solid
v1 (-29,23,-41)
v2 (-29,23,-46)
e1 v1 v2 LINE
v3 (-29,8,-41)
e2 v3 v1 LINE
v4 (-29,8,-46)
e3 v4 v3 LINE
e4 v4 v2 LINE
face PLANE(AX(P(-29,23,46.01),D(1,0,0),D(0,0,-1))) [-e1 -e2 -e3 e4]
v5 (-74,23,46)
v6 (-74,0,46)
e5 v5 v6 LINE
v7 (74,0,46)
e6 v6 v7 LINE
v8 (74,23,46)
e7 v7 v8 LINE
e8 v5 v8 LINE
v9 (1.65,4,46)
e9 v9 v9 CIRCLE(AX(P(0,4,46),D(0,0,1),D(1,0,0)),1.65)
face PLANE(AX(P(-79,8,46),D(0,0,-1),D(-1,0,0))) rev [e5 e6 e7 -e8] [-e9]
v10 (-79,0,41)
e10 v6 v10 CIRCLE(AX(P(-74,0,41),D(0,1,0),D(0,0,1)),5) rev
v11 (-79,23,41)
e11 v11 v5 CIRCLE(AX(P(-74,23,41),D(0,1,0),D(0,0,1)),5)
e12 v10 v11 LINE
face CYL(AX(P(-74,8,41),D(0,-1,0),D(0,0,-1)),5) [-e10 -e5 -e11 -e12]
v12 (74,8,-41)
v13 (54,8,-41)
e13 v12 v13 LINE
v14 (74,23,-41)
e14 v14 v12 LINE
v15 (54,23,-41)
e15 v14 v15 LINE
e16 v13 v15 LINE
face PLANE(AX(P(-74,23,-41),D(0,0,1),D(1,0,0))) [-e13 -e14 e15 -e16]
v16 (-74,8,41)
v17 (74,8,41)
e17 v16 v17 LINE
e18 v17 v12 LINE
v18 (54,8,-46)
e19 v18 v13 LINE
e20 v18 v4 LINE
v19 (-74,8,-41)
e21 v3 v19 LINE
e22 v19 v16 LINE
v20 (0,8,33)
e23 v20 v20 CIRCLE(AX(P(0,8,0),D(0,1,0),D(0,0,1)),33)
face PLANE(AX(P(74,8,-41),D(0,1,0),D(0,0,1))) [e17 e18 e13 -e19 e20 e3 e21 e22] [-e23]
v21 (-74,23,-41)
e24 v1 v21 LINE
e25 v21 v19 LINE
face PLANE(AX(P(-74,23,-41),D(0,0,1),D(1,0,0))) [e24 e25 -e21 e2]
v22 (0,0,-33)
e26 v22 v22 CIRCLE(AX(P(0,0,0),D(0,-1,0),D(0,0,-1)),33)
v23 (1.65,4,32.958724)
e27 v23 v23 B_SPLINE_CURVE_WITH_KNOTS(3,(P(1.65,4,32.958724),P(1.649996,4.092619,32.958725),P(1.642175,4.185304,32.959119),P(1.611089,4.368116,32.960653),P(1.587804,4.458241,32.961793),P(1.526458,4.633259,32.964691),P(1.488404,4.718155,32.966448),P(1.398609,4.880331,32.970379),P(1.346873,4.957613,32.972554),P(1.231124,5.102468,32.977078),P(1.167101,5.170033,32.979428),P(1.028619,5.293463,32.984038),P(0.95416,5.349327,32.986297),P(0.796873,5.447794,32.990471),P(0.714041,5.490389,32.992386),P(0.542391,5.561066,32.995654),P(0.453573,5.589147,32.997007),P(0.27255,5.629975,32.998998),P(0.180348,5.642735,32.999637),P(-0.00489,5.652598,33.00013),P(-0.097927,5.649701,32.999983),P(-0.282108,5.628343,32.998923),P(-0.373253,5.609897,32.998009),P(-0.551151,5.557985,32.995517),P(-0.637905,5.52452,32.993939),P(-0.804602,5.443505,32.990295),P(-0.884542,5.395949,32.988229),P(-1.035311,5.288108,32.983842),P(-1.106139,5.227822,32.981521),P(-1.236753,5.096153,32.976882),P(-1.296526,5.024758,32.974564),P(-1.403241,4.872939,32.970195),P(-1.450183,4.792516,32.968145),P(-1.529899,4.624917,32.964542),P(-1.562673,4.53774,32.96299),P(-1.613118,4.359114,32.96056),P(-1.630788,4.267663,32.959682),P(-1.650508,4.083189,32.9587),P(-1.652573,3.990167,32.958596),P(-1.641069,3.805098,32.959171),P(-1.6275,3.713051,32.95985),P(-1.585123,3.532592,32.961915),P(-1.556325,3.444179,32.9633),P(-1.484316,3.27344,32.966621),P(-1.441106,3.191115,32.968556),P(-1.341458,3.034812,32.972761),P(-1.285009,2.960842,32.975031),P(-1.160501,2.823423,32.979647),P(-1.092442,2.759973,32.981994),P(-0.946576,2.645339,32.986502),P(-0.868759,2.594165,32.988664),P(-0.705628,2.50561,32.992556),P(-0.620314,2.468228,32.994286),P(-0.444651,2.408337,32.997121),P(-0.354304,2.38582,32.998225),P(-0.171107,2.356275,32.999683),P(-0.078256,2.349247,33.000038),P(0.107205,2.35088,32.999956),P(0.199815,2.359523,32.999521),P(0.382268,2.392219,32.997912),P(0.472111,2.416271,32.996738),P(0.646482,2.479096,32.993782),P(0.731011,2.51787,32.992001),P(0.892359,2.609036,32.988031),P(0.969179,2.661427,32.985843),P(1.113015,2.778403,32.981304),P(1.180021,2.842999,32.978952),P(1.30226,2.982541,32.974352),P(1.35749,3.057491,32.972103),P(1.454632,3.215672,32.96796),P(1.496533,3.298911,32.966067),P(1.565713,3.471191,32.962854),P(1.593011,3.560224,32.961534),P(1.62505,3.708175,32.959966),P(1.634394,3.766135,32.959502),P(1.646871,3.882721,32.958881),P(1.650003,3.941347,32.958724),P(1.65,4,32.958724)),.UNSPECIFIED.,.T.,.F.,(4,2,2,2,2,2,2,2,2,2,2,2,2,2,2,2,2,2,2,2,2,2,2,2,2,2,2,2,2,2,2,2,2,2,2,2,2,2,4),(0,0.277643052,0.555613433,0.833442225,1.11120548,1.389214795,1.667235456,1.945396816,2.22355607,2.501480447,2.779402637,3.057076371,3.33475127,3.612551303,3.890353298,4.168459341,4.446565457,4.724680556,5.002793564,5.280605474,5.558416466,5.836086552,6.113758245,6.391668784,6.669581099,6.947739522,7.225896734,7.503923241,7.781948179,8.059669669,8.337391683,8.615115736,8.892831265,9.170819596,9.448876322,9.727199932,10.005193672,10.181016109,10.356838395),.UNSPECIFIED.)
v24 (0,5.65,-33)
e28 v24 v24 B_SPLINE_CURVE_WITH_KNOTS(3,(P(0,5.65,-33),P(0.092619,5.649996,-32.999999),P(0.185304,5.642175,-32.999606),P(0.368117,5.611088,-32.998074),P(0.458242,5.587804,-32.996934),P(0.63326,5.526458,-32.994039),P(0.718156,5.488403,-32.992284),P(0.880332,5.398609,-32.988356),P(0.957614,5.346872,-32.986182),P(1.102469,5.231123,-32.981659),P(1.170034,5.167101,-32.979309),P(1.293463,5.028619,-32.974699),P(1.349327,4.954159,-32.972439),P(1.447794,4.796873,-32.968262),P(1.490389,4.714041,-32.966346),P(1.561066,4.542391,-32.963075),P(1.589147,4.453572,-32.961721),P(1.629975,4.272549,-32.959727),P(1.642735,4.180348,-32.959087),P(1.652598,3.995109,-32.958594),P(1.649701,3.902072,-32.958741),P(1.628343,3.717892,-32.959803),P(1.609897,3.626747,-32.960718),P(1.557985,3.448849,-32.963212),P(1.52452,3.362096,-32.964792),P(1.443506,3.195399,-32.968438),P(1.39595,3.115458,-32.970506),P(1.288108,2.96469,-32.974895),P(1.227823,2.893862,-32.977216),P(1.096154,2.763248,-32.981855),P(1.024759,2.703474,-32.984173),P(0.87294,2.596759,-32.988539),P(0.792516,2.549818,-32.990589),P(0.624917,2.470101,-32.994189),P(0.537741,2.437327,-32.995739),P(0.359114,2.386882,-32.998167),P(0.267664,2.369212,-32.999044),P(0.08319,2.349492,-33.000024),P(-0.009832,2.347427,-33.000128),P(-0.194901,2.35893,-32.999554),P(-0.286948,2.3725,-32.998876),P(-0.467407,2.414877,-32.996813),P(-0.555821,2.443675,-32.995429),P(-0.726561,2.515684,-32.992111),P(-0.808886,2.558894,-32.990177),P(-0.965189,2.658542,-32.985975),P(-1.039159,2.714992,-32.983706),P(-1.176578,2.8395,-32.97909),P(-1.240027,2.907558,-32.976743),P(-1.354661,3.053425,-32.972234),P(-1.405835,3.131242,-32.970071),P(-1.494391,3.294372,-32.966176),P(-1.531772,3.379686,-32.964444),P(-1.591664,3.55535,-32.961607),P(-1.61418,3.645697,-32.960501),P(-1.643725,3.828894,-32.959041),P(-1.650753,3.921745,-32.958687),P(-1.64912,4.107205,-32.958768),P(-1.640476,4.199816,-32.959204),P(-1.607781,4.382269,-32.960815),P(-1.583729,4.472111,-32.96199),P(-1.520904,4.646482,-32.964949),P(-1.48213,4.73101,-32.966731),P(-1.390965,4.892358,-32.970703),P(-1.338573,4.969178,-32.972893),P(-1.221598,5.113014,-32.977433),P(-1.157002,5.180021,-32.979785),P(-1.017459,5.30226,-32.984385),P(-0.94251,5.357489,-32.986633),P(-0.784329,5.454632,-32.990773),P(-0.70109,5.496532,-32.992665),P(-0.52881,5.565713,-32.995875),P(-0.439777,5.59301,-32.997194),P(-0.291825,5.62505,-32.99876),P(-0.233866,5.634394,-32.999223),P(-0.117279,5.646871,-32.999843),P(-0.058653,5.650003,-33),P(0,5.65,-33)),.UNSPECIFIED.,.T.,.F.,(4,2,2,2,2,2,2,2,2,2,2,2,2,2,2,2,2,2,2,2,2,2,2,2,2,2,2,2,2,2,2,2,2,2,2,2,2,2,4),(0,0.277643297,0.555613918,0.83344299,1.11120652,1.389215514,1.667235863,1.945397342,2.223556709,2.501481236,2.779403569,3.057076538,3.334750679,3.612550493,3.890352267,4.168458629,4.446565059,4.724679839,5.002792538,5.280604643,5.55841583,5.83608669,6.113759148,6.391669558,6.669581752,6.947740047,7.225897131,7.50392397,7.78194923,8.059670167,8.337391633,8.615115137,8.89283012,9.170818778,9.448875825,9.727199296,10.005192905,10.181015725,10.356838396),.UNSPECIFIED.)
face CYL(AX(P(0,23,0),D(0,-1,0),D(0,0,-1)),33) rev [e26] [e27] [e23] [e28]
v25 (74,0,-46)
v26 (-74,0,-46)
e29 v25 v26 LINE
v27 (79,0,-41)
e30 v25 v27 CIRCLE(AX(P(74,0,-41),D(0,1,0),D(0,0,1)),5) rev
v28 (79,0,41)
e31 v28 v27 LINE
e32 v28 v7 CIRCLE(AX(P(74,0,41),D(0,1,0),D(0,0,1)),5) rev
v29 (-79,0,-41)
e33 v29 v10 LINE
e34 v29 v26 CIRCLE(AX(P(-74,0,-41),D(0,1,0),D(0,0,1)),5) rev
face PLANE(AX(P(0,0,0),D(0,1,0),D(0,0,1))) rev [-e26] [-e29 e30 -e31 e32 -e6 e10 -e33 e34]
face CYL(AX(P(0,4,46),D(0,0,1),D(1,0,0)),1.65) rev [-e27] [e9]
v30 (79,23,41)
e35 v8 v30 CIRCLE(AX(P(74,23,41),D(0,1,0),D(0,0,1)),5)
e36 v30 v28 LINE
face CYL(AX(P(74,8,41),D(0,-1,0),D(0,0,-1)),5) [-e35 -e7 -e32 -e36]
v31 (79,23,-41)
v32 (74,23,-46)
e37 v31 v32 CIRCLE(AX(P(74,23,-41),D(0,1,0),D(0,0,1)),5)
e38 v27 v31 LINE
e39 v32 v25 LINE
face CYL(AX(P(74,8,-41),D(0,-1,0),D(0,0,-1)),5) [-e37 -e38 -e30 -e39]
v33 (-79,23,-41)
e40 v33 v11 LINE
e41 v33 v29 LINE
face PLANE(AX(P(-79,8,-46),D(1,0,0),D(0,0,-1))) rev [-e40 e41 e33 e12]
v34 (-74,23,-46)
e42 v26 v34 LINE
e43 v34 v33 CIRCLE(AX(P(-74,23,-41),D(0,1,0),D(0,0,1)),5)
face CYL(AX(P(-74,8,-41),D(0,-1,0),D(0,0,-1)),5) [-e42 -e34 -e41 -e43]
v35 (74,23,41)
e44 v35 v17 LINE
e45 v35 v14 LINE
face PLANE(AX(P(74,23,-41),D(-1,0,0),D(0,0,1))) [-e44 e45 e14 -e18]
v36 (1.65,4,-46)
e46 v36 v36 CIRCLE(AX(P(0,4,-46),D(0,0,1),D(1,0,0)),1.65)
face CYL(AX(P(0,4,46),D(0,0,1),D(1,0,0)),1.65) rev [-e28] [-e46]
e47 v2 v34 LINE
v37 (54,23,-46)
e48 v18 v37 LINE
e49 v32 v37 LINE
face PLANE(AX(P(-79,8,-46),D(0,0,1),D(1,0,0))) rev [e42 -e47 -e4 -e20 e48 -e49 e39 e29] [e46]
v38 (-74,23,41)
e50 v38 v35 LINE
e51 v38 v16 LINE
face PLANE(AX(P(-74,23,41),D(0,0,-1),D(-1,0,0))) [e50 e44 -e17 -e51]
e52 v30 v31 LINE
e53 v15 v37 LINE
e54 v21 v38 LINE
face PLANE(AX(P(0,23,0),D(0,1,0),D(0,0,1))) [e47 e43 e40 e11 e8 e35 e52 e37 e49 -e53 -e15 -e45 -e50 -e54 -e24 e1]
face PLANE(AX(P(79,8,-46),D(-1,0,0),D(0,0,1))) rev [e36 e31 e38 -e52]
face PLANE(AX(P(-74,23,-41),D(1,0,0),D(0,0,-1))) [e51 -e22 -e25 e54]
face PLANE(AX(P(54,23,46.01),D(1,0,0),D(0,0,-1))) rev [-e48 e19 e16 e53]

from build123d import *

# Parameters (mm, degrees)
SKETCH1_W             = 158
SKETCH1_H             = 92
BOSS_EXTRUDE1_DEPTH   = 8
SKETCH2_W             = 158
SKETCH2_H             = 92
SKETCH2_W_2           = 148
SKETCH2_H_2           = 82
BOSS_EXTRUDE2_DEPTH   = 15
SKETCH3_R             = 33
CUT_EXTRUDE1_DEPTH    = 95.265582266
FILLET1_R             = 5
FILLET2_R             = 5
SPLIT1_START          = -29
SPLIT1_OUTLINE_W      = 15
SPLIT1_OUTLINE_H      = 5
SPLIT1_DEPTH          = 83
M4X0_7_TAPPED_HOLE1_D = 3.3


# Read off the part's stored shape, not the designer's step: Split1
with BuildPart() as part:
    # Sketch1 → Boss-Extrude1 (new body)
    with BuildSketch(Plane(origin=(0, 0, 0), x_dir=(1, 0, 0), z_dir=(0, 1, 0))):
        Rectangle(SKETCH1_W, SKETCH1_H)
    extrude(amount=BOSS_EXTRUDE1_DEPTH)

    # Sketch2 → Boss-Extrude2 (add)
    with BuildSketch(Plane(origin=(0, 8, 0), x_dir=(1, 0, 0), z_dir=(0, 1, 0))):
        Rectangle(SKETCH2_W, SKETCH2_H)
        Rectangle(SKETCH2_W_2, SKETCH2_H_2, mode=Mode.SUBTRACT)
    extrude(amount=BOSS_EXTRUDE2_DEPTH)

    # Sketch3 → Cut-Extrude1 (cut, through all)
    with BuildSketch(Plane.XZ):
        with Locations(Location((0, 0, 0), (0, 0, 270))):
            Circle(SKETCH3_R)
    extrude(amount=-CUT_EXTRUDE1_DEPTH, mode=Mode.SUBTRACT)

    # Fillet1
    fillet1_edges = [part.edges().sort_by_distance(p)[0] for p in [
        (-79, 11.5, 46),
    ]]
    fillet(fillet1_edges, radius=FILLET1_R)

    # Fillet2
    fillet2_edges = [part.edges().sort_by_distance(p)[0] for p in [
        (79, 11.5, 46),
        (-79, 11.5, -46),
        (79, 11.5, -46),
    ]]
    fillet(fillet2_edges, radius=FILLET2_R)

    # Split1 outline → Split1 (cut)
    with BuildSketch(Plane.YZ.offset(SPLIT1_START)):
        with Locations((15.5, -43.5)):
            Rectangle(SPLIT1_OUTLINE_W, SPLIT1_OUTLINE_H)
    extrude(amount=SPLIT1_DEPTH, mode=Mode.SUBTRACT)

    # M4x0.7 Tapped Hole1 (through all)
    with Locations(Plane.XY.offset(46)):
        with Locations((0, 4)):
            Hole(M4X0_7_TAPPED_HOLE1_D / 2)


solid = part.part
